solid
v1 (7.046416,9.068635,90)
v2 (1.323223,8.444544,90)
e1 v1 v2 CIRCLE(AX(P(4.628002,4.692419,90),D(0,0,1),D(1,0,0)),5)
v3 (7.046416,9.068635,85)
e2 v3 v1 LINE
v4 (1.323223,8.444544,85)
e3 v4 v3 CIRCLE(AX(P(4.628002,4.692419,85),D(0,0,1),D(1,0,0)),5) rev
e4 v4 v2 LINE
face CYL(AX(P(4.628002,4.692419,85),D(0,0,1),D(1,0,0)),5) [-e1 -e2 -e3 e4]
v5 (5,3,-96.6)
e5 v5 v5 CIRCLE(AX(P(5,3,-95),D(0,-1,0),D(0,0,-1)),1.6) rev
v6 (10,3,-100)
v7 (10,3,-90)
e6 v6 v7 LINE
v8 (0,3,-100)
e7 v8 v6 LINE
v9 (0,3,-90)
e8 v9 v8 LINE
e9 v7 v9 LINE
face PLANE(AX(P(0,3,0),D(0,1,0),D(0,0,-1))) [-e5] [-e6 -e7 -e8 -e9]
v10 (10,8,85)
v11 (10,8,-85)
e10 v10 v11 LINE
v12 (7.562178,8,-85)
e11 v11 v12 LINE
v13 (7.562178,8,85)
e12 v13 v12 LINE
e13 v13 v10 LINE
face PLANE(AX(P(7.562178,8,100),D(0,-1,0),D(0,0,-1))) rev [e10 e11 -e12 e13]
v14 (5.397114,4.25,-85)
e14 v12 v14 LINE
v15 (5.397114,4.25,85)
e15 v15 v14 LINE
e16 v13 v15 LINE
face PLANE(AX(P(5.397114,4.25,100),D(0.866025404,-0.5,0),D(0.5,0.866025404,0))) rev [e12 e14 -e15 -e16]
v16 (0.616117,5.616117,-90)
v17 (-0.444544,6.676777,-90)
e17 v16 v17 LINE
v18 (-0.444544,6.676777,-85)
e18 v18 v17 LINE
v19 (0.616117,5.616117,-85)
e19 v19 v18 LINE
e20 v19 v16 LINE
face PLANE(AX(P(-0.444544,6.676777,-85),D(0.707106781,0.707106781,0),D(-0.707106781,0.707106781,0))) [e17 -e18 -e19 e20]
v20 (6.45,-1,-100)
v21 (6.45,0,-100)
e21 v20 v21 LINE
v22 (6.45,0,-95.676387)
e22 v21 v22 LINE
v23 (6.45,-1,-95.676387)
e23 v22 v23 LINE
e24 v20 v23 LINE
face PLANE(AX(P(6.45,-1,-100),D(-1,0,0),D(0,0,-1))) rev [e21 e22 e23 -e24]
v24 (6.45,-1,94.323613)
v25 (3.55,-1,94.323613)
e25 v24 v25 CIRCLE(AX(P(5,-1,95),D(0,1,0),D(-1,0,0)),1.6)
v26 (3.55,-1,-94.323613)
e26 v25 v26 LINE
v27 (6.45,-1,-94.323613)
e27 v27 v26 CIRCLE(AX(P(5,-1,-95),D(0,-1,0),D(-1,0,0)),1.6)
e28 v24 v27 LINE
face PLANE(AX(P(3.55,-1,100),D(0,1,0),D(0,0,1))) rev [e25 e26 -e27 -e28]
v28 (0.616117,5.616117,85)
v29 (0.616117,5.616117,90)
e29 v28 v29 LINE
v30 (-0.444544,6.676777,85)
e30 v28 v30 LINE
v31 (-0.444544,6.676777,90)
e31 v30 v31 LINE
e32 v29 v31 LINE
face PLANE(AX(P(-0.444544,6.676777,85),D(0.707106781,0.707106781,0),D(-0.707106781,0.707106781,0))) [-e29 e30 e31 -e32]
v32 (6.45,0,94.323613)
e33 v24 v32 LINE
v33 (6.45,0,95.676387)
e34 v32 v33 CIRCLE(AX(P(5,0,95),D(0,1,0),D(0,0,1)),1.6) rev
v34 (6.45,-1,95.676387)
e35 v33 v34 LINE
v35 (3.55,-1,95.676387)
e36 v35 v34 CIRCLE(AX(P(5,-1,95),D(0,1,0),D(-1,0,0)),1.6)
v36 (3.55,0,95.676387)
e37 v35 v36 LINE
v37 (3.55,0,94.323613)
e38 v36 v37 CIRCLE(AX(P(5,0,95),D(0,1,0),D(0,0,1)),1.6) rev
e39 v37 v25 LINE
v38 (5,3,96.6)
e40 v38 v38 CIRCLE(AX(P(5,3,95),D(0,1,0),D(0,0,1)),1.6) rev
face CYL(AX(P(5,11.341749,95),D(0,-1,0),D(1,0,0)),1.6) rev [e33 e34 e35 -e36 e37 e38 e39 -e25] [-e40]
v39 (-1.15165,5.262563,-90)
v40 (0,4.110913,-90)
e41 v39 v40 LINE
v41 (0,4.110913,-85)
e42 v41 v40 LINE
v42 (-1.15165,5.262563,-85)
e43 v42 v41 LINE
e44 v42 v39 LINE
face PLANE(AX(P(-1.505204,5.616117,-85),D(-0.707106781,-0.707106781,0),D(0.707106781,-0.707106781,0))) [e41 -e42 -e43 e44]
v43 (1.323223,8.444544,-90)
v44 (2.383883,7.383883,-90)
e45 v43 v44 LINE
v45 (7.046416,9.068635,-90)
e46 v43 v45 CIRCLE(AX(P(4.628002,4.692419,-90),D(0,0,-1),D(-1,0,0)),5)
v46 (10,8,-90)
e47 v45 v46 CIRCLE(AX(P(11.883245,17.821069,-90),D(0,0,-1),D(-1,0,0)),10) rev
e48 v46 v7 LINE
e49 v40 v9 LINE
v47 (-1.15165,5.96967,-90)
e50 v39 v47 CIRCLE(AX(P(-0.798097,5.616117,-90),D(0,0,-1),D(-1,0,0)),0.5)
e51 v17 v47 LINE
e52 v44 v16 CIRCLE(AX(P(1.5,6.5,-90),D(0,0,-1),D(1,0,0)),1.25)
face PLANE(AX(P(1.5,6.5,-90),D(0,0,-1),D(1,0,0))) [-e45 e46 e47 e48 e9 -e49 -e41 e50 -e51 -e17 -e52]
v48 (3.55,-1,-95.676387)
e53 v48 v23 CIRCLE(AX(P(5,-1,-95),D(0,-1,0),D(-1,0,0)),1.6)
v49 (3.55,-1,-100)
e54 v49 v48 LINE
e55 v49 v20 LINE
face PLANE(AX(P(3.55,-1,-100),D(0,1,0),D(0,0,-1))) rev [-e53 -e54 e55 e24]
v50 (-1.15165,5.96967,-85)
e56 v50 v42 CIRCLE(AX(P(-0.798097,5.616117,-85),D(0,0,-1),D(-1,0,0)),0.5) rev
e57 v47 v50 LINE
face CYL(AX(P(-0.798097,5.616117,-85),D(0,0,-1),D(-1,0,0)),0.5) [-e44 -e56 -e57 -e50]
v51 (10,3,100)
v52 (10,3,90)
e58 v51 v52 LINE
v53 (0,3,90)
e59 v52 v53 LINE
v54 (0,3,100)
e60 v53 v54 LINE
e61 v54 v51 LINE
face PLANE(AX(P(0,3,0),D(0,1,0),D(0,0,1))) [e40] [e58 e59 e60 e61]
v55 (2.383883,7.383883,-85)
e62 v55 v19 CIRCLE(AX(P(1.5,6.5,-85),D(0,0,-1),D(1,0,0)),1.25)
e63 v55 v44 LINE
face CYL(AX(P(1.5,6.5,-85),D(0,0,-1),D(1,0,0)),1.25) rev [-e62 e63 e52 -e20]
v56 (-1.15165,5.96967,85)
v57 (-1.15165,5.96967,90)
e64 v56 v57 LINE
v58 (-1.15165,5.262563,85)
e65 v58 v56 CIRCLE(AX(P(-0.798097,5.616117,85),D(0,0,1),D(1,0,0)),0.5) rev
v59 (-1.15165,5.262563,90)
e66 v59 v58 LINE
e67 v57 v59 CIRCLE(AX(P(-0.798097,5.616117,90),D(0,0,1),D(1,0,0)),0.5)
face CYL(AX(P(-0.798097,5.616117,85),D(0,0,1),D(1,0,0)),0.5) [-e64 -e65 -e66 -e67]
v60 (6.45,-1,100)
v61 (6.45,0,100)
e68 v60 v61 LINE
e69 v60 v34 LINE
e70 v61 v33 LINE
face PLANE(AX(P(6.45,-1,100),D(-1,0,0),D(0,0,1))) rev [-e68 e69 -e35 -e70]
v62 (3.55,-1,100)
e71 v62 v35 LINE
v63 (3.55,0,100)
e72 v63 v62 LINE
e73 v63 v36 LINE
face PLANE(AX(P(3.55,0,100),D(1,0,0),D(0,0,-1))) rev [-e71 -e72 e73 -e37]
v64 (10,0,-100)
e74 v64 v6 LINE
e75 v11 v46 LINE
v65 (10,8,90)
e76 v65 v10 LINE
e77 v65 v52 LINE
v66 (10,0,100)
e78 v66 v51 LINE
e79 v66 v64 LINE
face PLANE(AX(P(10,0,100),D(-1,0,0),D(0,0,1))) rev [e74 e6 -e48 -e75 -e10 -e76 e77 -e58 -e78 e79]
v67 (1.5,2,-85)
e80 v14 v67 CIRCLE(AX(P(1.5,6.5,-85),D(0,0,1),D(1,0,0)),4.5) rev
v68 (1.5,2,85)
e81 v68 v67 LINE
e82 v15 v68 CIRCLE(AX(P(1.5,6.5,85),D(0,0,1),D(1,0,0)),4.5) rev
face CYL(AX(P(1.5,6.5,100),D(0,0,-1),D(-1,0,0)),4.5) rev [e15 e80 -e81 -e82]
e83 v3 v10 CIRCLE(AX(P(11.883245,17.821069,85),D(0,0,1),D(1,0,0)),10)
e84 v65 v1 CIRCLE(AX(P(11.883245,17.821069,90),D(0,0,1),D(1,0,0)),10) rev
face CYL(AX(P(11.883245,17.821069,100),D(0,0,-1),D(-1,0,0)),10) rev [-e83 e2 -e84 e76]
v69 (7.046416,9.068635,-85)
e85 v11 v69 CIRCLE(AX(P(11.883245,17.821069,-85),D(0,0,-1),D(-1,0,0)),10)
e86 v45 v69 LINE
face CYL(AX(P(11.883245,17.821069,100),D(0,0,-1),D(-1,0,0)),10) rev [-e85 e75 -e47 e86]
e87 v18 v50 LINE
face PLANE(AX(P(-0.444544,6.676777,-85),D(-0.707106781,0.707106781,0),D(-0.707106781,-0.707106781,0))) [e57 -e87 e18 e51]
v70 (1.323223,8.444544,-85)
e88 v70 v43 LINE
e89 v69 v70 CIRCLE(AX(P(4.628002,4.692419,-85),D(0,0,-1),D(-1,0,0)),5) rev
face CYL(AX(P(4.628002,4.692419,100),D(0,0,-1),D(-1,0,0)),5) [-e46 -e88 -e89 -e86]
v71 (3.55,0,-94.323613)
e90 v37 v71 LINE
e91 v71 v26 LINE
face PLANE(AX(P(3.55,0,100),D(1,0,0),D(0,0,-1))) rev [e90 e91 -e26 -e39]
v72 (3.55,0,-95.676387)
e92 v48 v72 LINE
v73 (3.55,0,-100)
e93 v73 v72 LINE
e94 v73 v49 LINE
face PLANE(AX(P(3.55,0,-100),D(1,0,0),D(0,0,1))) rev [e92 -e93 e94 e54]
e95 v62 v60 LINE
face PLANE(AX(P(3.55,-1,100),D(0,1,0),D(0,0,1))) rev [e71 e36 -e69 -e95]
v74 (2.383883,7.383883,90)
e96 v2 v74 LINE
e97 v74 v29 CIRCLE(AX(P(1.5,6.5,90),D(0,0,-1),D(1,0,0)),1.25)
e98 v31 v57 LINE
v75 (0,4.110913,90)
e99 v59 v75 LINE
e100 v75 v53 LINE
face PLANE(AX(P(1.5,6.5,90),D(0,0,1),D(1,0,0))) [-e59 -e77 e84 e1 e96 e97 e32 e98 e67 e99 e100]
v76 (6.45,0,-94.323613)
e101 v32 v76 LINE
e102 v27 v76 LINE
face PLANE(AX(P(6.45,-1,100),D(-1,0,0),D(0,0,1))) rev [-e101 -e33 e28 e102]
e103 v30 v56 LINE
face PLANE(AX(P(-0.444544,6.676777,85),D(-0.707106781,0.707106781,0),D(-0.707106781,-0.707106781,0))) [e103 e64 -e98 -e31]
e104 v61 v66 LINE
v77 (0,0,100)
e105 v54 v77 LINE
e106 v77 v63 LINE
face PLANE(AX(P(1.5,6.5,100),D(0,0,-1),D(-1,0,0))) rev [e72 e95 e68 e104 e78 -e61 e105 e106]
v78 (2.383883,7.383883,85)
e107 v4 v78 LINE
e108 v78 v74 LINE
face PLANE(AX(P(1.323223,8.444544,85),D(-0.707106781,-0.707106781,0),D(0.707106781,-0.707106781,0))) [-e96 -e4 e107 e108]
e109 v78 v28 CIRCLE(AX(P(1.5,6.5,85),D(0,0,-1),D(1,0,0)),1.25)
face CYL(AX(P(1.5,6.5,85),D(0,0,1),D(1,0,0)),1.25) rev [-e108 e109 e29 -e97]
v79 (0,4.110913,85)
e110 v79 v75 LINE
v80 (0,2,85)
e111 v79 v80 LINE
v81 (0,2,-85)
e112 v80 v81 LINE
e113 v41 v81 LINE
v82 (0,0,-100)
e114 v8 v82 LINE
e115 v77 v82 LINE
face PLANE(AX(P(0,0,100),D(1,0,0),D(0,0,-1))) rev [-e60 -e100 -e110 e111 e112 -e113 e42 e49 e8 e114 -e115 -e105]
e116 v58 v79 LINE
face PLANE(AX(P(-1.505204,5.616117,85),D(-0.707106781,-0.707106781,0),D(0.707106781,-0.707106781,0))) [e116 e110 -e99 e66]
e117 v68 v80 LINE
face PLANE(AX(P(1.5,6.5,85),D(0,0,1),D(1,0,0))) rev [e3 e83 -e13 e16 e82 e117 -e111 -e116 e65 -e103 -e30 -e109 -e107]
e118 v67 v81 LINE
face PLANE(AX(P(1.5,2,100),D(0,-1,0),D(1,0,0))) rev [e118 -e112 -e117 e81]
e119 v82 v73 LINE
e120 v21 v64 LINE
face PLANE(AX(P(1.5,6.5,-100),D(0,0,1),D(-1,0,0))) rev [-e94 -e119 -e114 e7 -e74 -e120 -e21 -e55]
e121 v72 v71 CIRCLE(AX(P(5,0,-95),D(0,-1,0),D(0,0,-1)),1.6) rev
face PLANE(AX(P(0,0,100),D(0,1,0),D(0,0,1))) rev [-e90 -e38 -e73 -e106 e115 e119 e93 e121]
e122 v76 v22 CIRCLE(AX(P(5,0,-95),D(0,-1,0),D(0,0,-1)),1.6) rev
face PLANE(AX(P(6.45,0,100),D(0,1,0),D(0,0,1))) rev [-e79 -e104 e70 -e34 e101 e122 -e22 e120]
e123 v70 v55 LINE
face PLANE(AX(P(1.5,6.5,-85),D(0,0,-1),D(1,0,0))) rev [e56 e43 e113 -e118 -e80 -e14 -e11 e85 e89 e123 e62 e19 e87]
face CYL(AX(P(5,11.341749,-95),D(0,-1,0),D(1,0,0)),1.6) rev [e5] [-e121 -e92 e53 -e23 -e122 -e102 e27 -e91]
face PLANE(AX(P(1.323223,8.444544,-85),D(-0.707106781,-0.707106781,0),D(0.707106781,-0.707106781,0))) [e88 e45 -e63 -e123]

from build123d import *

# Parameters (mm, degrees)
MAIN_DEPTH                  = 100
FIXFORROLLINGCYLINDER_DEPTH = 5
SKETCH4_W                   = 10
SKETCH4_H                   = 10
HORIZONTALCUT_DEPTH         = 10
SKETCH7_W                   = 10
SKETCH7_H                   = 10
BOSS_EXTRUDE1_DEPTH         = 1
MAKERBEAMHOLE_DEPTH         = 101.931998276
MAKERBEAMHOLE_DEPTH_BACK    = 101.931998276
SKETCH5_R                   = 1.6
FILLET1_R                   = 10
FILLET2_R                   = 5
FILLET3_R                   = 0.5


with BuildPart() as part:
    # Sketch1 → Main (new body)
    with BuildSketch(Plane.XY):
        with BuildLine():
            Line((0, 0), (3.55, 0))
            Line((3.55, 0), (3.55, -1))
            Line((3.55, -1), (6.45, -1))
            Line((6.45, -1), (6.45, 0))
            Line((6.45, 0), (10, 0))
            Line((10, 0), (10, 8))
            Line((10, 8), (7.562177826, 8))
            Line((7.562177826, 8), (5.397114317, 4.25))
            ThreePointArc((5.397114317, 4.25), (3.75, 2.602885683), (1.5, 2))
            Line((1.5, 2), (0, 2))
            Line((0, 2), (0, 0))
        make_face()
    extrude(amount=MAIN_DEPTH)

    # Sketch3 → FixForRollingCylinder (add)
    with BuildSketch(Plane.XY.offset(90)):
        with BuildLine():
            Line((-1.50520382, 5.616116524), (0, 4.110912703))
            Line((0, 4.110912703), (0, 0))
            Line((0, 0), (10, 0))
            Line((10, 0), (10, 8))
            Line((10, 8), (7.562177826, 8))
            Line((7.562177826, 8), (4.220428741, 11.341749085))
            Line((4.220428741, 11.341749085), (1.323223305, 8.444543648))
            Line((1.323223305, 8.444543648), (2.383883476, 7.383883476))
            ThreePointArc((2.383883476, 7.383883476), (2.383883476, 5.616116524), (0.616116524, 5.616116524))
            Line((0.616116524, 5.616116524), (-0.444543648, 6.676776695))
            Line((-0.444543648, 6.676776695), (-1.50520382, 5.616116524))
        make_face()
    extrude(amount=-FIXFORROLLINGCYLINDER_DEPTH)

    # Sketch4 → HorizontalCut (cut)
    with BuildSketch(Plane(origin=(0, 3, 0), x_dir=(1, 0, 0), z_dir=(0, 1, 0))):
        with Locations((5, -95)):
            Rectangle(SKETCH4_W, SKETCH4_H)
    extrude(amount=HORIZONTALCUT_DEPTH, mode=Mode.SUBTRACT)

    # Sketch7 → Boss-Extrude1 (add)
    with BuildSketch(Plane(origin=(0, 3, 0), x_dir=(1, 0, 0), z_dir=(0, 1, 0))):
        with Locations((5, -95)):
            Rectangle(SKETCH7_W, SKETCH7_H)
    extrude(amount=-BOSS_EXTRUDE1_DEPTH)

    # Sketch5 → MakerBeamHole (cut, two sides: drawn at the far end of the back side and taken through both)
    with BuildSketch(Plane(origin=(0, 2, 0), x_dir=(1, 0, 0), z_dir=(0, 1, 0)).offset(-MAKERBEAMHOLE_DEPTH_BACK)):
        with Locations(Location((5, -95, 0), (0, 0, 25.007833235))):
            Circle(SKETCH5_R)
    extrude(amount=MAKERBEAMHOLE_DEPTH + MAKERBEAMHOLE_DEPTH_BACK, mode=Mode.SUBTRACT)

    # Mirror1: part across plane


with BuildPart() as part_1:
    add(part.part)
    add(part.part.mirror(Plane.XY))

    # Fillet1
    # the kernel refuses this fillet: 10 mm, written as the material it adds along each edge
    with BuildSketch(Plane(origin=(7.562177826, 8, -90), x_dir=(-0.7071067811865462, 0.7071067811865489, 0), z_dir=(0, 0, 1))) as fillet1_piece_1:
        with BuildLine():
            CenterArc((3.889088446, -10), FILLET1_R, 90, 34.144980958)
            Line((-1.72380059, -1.72380059), (0, 0))
            Line((0, 0), (3.889088446, 0))
        make_face()
    extrude(amount=5)
    with BuildSketch(Plane(origin=(7.562177826, 8, 90), x_dir=(-0.7071067811865462, 0.7071067811865489, 0), z_dir=(0, 0, -1))) as fillet1_piece_2:
        with BuildLine():
            CenterArc((3.889088446, 10), FILLET1_R, 235.855019042, 34.144980958)
            Line((-1.72380059, 1.72380059), (0, 0))
            Line((0, 0), (3.889088446, 0))
        make_face()
    extrude(amount=5)

    # Fillet2
    # the kernel refuses this fillet: 5 mm, written as the material it takes off along each edge
    with BuildSketch(Plane(origin=(4.220428741, 11.341749085, -100.243168054), x_dir=(0.7792084739241206, -0.6267648316273362, 0), z_dir=(0, 0, 1))) as fillet2_piece_1:
        with BuildLine():
            CenterArc((4.485150557, -4.925762162), FILLET2_R, 99.885624433, 70.299011634)
            Line((-0.441660549, -4.073393505), (-0.93434166, -3.988156639))
            ThreePointArc((-0.93434166, -3.988156639), (-0.717916904, -1.982799786), (-0.497086629, 0.053896967))
            Line((-0.497086629, 0.053896967), (0.053896967, 0.497086629))
            ThreePointArc((0.053896967, 0.497086629), (0.885879241, 0.406878367), (3.540899942, 0.492576216))
            Line((3.540899942, 0.492576216), (3.626740907, 0))
        make_face()
    extrude(amount=25.486336108, mode=Mode.SUBTRACT)
    with BuildSketch(Plane(origin=(4.220428741, 11.341749085, 100.243168054), x_dir=(0.7792084739241207, -0.626764831627336, 0), z_dir=(0, 0, -1))) as fillet2_piece_2:
        with BuildLine():
            CenterArc((4.485150557, 4.925762162), FILLET2_R, 189.815363933, 70.299011634)
            Line((-0.441660549, 4.073393505), (-0.93434166, 3.988156639))
            ThreePointArc((-0.93434166, 3.988156639), (-0.717916904, 1.982799786), (-0.497086629, -0.053896967))
            Line((-0.497086629, -0.053896967), (0.053896967, -0.497086629))
            ThreePointArc((0.053896967, -0.497086629), (0.885879241, -0.406878367), (3.540899942, -0.492576216))
            Line((3.540899942, -0.492576216), (3.626740907, 0))
        make_face()
    extrude(amount=25.486336108, mode=Mode.SUBTRACT)

    # Fillet3
    fillet3_edges = [part_1.edges().sort_by_distance(p)[0] for p in [
        (-1.50520382, 5.616116524, -87.5),
        (-1.50520382, 5.616116524, 87.5),
    ]]
    fillet(fillet3_edges, radius=FILLET3_R)


solid = part_1.part
